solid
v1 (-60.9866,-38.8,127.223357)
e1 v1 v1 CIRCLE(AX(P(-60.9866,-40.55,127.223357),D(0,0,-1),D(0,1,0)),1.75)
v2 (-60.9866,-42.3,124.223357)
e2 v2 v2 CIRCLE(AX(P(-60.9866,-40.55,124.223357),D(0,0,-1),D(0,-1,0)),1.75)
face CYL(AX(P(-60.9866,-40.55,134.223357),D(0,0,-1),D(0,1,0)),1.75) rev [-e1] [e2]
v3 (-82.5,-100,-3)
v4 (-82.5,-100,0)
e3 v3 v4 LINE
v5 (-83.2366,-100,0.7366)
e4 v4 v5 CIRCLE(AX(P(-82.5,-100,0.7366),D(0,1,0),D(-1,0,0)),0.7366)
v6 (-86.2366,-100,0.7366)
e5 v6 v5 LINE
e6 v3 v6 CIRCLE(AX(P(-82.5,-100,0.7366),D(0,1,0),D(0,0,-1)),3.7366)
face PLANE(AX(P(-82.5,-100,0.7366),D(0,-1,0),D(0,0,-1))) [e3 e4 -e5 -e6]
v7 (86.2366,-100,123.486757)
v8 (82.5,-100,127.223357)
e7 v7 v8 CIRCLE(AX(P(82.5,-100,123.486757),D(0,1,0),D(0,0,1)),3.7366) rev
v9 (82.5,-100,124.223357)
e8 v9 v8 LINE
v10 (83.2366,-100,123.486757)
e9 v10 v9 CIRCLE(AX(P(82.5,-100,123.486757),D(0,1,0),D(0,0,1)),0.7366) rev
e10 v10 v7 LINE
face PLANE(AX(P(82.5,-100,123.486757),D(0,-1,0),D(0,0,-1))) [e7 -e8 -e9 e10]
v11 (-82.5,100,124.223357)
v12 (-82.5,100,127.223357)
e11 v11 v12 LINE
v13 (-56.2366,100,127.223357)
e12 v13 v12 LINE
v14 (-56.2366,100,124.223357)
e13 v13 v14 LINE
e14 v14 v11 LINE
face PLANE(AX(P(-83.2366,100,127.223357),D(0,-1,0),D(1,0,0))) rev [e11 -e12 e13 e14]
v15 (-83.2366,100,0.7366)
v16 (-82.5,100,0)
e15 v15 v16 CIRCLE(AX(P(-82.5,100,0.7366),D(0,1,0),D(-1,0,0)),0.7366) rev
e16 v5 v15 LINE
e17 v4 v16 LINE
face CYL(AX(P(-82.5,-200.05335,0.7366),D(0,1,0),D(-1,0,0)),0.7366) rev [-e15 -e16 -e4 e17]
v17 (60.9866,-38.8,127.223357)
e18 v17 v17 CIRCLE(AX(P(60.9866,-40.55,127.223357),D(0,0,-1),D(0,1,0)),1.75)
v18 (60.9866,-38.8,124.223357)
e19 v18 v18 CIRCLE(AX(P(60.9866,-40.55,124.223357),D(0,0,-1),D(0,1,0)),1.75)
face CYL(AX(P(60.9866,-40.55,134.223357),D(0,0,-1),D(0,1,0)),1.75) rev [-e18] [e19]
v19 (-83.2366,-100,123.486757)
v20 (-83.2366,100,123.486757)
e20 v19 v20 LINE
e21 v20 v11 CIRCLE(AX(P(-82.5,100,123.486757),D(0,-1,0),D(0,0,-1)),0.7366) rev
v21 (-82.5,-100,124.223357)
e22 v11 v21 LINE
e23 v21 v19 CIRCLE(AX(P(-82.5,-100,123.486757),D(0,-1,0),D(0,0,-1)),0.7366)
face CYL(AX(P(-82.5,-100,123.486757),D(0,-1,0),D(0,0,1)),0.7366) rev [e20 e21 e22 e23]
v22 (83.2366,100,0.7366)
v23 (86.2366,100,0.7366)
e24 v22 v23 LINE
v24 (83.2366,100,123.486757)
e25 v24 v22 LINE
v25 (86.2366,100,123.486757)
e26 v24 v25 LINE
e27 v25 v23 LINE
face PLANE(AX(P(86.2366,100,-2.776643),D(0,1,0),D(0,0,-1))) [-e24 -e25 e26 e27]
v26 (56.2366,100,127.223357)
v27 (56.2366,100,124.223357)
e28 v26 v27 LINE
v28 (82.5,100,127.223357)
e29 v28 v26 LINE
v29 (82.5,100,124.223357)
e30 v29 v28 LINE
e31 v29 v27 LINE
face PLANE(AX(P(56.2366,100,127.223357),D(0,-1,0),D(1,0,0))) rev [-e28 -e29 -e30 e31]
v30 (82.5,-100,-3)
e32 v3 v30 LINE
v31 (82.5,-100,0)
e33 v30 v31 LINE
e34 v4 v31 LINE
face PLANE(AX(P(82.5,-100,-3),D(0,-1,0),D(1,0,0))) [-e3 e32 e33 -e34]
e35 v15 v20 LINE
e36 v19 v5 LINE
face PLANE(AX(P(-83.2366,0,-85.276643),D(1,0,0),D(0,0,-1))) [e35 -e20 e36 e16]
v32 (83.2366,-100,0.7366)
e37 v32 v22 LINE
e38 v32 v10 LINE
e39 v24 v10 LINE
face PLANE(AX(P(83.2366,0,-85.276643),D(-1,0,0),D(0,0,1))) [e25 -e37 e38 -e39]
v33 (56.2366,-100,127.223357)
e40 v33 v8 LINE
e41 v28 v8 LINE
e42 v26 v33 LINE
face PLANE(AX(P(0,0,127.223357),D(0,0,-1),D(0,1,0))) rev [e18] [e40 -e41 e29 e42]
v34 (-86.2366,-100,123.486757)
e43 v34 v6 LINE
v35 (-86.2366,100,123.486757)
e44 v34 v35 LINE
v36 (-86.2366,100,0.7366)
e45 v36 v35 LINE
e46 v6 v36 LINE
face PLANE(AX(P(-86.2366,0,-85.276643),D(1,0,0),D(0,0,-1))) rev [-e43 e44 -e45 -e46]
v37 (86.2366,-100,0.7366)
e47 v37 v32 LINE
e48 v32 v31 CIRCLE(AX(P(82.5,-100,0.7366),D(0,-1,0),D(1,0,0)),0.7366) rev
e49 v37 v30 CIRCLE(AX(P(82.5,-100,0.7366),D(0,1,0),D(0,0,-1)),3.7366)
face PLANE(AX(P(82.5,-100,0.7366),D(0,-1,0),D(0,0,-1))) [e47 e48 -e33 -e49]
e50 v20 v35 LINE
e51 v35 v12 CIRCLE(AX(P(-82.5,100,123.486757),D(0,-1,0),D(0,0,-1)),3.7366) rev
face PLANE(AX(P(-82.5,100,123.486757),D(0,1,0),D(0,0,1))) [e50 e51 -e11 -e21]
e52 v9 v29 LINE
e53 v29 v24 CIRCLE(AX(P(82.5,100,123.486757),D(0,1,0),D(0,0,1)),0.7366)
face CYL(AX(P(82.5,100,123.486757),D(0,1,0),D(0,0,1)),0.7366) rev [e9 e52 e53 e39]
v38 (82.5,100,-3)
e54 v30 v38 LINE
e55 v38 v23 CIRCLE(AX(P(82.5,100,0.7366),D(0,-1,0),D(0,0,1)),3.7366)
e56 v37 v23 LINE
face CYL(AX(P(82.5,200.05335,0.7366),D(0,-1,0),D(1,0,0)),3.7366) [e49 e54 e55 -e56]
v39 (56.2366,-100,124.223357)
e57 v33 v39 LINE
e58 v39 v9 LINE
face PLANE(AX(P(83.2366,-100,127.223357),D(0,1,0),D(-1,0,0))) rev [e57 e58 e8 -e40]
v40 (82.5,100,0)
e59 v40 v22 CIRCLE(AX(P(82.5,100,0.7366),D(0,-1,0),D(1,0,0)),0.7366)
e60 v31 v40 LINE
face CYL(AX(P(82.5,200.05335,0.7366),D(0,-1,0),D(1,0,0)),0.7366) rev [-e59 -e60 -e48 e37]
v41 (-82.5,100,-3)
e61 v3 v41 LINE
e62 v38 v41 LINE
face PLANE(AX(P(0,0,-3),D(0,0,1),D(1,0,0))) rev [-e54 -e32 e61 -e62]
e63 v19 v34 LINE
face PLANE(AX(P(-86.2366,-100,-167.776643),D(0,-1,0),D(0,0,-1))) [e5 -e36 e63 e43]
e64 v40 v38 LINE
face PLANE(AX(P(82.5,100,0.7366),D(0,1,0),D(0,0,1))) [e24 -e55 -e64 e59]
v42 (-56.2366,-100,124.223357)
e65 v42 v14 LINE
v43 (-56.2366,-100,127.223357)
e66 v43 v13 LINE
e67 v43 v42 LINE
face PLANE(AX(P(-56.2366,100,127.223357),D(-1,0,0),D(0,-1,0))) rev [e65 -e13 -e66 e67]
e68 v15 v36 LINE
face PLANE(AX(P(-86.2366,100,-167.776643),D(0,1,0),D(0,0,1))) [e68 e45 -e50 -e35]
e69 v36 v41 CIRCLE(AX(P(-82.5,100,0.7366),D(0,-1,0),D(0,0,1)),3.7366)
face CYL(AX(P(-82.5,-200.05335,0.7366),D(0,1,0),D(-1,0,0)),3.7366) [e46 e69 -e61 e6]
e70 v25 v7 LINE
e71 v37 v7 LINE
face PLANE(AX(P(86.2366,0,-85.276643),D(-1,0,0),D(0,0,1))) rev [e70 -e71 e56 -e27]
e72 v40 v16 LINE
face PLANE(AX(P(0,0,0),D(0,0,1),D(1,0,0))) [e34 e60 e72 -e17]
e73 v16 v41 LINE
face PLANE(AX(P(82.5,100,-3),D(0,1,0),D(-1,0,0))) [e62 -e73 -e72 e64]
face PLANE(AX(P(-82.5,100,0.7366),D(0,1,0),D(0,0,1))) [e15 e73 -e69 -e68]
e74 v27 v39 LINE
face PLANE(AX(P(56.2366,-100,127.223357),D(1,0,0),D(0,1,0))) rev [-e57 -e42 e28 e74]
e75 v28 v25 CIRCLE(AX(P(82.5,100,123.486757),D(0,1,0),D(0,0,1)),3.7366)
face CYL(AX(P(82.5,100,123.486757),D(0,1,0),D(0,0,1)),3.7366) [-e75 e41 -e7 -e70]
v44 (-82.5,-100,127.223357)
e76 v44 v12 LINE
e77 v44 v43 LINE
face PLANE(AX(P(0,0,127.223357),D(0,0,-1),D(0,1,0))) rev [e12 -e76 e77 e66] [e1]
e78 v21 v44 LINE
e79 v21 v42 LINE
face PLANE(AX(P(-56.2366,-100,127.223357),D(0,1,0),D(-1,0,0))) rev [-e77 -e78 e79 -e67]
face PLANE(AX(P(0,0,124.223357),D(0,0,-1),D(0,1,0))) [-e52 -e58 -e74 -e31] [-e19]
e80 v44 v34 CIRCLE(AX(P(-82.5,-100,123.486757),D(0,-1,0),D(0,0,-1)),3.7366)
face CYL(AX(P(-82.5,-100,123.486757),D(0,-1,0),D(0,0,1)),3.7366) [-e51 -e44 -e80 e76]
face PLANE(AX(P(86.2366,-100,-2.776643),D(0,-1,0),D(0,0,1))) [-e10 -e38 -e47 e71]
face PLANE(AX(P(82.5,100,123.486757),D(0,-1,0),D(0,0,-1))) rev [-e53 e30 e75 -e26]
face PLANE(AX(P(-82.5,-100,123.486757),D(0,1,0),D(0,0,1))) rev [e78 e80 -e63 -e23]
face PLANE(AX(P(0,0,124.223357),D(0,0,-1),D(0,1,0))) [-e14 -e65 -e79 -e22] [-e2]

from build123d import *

# Parameters (mm, degrees)
SKETCH1_W                    = 165
SKETCH1_H                    = 200
BASE_FLANGE1_DEPTH           = 3
SKETCH6_W                    = 130
SKETCH6_H                    = 200
TAB1_DEPTH                   = 3
SKETCHED_START               = -100
SKETCHED_BEND1_DEPTH         = 200
SKETCHED_BEND1_2_DEPTH       = 200
SKETCH10_W                   = 130
SKETCH10_H                   = 200
TAB2_DEPTH                   = 3
SKETCHED_BEND2_DEPTH         = 200
SKETCHED_BEND2_2_DEPTH       = 200
EDGE_FLANGE1_STRIP_W         = 13.4732
EDGE_FLANGE1_STRIP_H         = 3
EDGE_FLANGE1_STRIP_CUT_DEPTH = 200
EDGE_FLANGE1_DEPTH           = 200
EDGE_FLANGE2_STRIP_W         = 13.4732
EDGE_FLANGE2_STRIP_H         = 3
EDGE_FLANGE2_STRIP_CUT_DEPTH = 200
EDGE_FLANGE2_DEPTH           = 200
SKETCH20_R                   = 1.75
CUT_EXTRUDE1_DEPTH           = 10


# Read off the part's stored shape, not the designer's step: Sketched Bend1, Sketched Bend2
# Sheet-metal steps are written as plain solids
with BuildPart() as part:
    # Sketch1 → Base-Flange1 (new body)
    with BuildSketch(Plane.XY):
        Rectangle(SKETCH1_W, SKETCH1_H)
    extrude(amount=-BASE_FLANGE1_DEPTH)

    # Sketch6 → Tab1 (add)
    with BuildSketch(Plane(origin=(0, 0, -3), x_dir=(-1, 0, 0), z_dir=(0, 0, -1))):
        with Locations((-147.5, 0)):
            Rectangle(SKETCH6_W, SKETCH6_H)
    extrude(amount=-TAB1_DEPTH)

    # Sketched Bend1 outline → Sketched Bend1 (cut)
    with BuildSketch(Plane(origin=(0, 0, 0), x_dir=(1, 0, 0), z_dir=(0, 1, 0)).offset(SKETCHED_START)):
        with BuildLine():
            ThreePointArc((82.5, 3), (84.867467001, 2.154295979), (86.163277222, 0))
            Line((86.163277222, 0), (212.5, 0))
            Line((212.5, 0), (212.5, 3))
            Line((212.5, 3), (82.5, 3))
        make_face()
    extrude(amount=SKETCHED_BEND1_DEPTH, mode=Mode.SUBTRACT)

    # Sketched Bend1 2 outline → Sketched Bend1 2 (add)
    with BuildSketch(Plane(origin=(0, 0, 0), x_dir=(1, 0, 0), z_dir=(0, 1, 0)).offset(SKETCHED_START)):
        with BuildLine():
            Line((86.2366, -127.223356935), (86.2366, -0.7366))
            ThreePointArc((86.2366, -0.7366), (86.218224121, -0.36647982), (86.163277222, 0))
            Line((86.163277222, 0), (82.5, 0))
            ThreePointArc((82.5, 0), (83.020854855, -0.215745145), (83.2366, -0.7366))
            Line((83.2366, -0.7366), (83.2366, -127.223356935))
            Line((83.2366, -127.223356935), (86.2366, -127.223356935))
        make_face()
    extrude(amount=SKETCHED_BEND1_2_DEPTH)

    # Sketch10 → Tab2 (add)
    with BuildSketch(Plane.XY):
        with Locations((-147.5, 0)):
            Rectangle(SKETCH10_W, SKETCH10_H)
    extrude(amount=-TAB2_DEPTH)

    # Sketched Bend2 outline → Sketched Bend2 (cut)
    with BuildSketch(Plane(origin=(0, 0, 0), x_dir=(1, 0, 0), z_dir=(0, 1, 0)).offset(SKETCHED_START)):
        with BuildLine():
            Line((-212.5, 0), (-86.163277222, 0))
            ThreePointArc((-86.163277222, 0), (-84.867467001, 2.154295979), (-82.5, 3))
            Line((-82.5, 3), (-212.5, 3))
            Line((-212.5, 3), (-212.5, 0))
        make_face()
    extrude(amount=SKETCHED_BEND2_DEPTH, mode=Mode.SUBTRACT)

    # Sketched Bend2 2 outline → Sketched Bend2 2 (add)
    with BuildSketch(Plane(origin=(0, 0, 0), x_dir=(1, 0, 0), z_dir=(0, 1, 0)).offset(SKETCHED_START)):
        with BuildLine():
            Line((-86.2366, -0.7366), (-86.2366, -127.223356935))
            Line((-86.2366, -127.223356935), (-83.2366, -127.223356935))
            Line((-83.2366, -127.223356935), (-83.2366, -0.7366))
            ThreePointArc((-83.2366, -0.7366), (-83.020854855, -0.215745145), (-82.5, 0))
            Line((-82.5, 0), (-86.163277222, 0))
            ThreePointArc((-86.163277222, 0), (-86.218224121, -0.36647982), (-86.2366, -0.7366))
        make_face()
    extrude(amount=SKETCHED_BEND2_2_DEPTH)

    # Edge-Flange1 strip (across the edge) → Edge-Flange1 strip cut (cut)
    with BuildSketch(Plane(origin=(-83.2366, 100, 127.223356935), x_dir=(0, 0, -1), z_dir=(0, -1, 0))):
        with Locations((-3, -1.5)):
            Rectangle(EDGE_FLANGE1_STRIP_W, EDGE_FLANGE1_STRIP_H)
    extrude(amount=EDGE_FLANGE1_STRIP_CUT_DEPTH, mode=Mode.SUBTRACT)

    # Edge-Flange1 section (across the edge) → Edge-Flange1 (add)
    with BuildSketch(Plane(origin=(-83.2366, 100, 127.223356935), x_dir=(0, 0, -1), z_dir=(0, -1, 0))):
        with BuildLine():
            Line((0, 0.7366), (0, 27))
            Line((0, 27), (3, 27))
            Line((3, 27), (3, 0.7366))
            ThreePointArc((3, 0.7366), (3.215745145, 0.215745145), (3.7366, 0))
            Line((3.7366, 0), (3.7366, -3))
            ThreePointArc((3.7366, -3), (1.094424801, -1.905575199), (0, 0.7366))
        make_face()
    extrude(amount=EDGE_FLANGE1_DEPTH)

    # Edge-Flange2 strip (across the edge) → Edge-Flange2 strip cut (cut)
    with BuildSketch(Plane(origin=(83.2366, -100, 127.223356935), x_dir=(0, 0, -1), z_dir=(0, 1, 0))):
        with Locations((-3, -1.5)):
            Rectangle(EDGE_FLANGE2_STRIP_W, EDGE_FLANGE2_STRIP_H)
    extrude(amount=EDGE_FLANGE2_STRIP_CUT_DEPTH, mode=Mode.SUBTRACT)

    # Edge-Flange2 section (across the edge) → Edge-Flange2 (add)
    with BuildSketch(Plane(origin=(83.2366, -100, 127.223356935), x_dir=(0, 0, -1), z_dir=(0, 1, 0))):
        with BuildLine():
            Line((0, 0.7366), (0, 27))
            Line((0, 27), (3, 27))
            Line((3, 27), (3, 0.7366))
            ThreePointArc((3, 0.7366), (3.215745145, 0.215745145), (3.7366, 0))
            Line((3.7366, 0), (3.7366, -3))
            ThreePointArc((3.7366, -3), (1.094424801, -1.905575199), (0, 0.7366))
        make_face()
    extrude(amount=EDGE_FLANGE2_DEPTH)

    # Sketch20 → Cut-Extrude1 (cut)
    with BuildSketch(Plane(origin=(0, 0, 124.223356935), x_dir=(-1, 0, 0), z_dir=(0, 0, -1))):
        with Locations(Location((-60.9866, -40.55, 0), (0, 0, 90))):
            Circle(SKETCH20_R)
        with Locations(Location((60.9866, -40.55, 0), (0, 0, 90))):
            Circle(SKETCH20_R)
    extrude(amount=-CUT_EXTRUDE1_DEPTH, mode=Mode.SUBTRACT)


solid = part.part
